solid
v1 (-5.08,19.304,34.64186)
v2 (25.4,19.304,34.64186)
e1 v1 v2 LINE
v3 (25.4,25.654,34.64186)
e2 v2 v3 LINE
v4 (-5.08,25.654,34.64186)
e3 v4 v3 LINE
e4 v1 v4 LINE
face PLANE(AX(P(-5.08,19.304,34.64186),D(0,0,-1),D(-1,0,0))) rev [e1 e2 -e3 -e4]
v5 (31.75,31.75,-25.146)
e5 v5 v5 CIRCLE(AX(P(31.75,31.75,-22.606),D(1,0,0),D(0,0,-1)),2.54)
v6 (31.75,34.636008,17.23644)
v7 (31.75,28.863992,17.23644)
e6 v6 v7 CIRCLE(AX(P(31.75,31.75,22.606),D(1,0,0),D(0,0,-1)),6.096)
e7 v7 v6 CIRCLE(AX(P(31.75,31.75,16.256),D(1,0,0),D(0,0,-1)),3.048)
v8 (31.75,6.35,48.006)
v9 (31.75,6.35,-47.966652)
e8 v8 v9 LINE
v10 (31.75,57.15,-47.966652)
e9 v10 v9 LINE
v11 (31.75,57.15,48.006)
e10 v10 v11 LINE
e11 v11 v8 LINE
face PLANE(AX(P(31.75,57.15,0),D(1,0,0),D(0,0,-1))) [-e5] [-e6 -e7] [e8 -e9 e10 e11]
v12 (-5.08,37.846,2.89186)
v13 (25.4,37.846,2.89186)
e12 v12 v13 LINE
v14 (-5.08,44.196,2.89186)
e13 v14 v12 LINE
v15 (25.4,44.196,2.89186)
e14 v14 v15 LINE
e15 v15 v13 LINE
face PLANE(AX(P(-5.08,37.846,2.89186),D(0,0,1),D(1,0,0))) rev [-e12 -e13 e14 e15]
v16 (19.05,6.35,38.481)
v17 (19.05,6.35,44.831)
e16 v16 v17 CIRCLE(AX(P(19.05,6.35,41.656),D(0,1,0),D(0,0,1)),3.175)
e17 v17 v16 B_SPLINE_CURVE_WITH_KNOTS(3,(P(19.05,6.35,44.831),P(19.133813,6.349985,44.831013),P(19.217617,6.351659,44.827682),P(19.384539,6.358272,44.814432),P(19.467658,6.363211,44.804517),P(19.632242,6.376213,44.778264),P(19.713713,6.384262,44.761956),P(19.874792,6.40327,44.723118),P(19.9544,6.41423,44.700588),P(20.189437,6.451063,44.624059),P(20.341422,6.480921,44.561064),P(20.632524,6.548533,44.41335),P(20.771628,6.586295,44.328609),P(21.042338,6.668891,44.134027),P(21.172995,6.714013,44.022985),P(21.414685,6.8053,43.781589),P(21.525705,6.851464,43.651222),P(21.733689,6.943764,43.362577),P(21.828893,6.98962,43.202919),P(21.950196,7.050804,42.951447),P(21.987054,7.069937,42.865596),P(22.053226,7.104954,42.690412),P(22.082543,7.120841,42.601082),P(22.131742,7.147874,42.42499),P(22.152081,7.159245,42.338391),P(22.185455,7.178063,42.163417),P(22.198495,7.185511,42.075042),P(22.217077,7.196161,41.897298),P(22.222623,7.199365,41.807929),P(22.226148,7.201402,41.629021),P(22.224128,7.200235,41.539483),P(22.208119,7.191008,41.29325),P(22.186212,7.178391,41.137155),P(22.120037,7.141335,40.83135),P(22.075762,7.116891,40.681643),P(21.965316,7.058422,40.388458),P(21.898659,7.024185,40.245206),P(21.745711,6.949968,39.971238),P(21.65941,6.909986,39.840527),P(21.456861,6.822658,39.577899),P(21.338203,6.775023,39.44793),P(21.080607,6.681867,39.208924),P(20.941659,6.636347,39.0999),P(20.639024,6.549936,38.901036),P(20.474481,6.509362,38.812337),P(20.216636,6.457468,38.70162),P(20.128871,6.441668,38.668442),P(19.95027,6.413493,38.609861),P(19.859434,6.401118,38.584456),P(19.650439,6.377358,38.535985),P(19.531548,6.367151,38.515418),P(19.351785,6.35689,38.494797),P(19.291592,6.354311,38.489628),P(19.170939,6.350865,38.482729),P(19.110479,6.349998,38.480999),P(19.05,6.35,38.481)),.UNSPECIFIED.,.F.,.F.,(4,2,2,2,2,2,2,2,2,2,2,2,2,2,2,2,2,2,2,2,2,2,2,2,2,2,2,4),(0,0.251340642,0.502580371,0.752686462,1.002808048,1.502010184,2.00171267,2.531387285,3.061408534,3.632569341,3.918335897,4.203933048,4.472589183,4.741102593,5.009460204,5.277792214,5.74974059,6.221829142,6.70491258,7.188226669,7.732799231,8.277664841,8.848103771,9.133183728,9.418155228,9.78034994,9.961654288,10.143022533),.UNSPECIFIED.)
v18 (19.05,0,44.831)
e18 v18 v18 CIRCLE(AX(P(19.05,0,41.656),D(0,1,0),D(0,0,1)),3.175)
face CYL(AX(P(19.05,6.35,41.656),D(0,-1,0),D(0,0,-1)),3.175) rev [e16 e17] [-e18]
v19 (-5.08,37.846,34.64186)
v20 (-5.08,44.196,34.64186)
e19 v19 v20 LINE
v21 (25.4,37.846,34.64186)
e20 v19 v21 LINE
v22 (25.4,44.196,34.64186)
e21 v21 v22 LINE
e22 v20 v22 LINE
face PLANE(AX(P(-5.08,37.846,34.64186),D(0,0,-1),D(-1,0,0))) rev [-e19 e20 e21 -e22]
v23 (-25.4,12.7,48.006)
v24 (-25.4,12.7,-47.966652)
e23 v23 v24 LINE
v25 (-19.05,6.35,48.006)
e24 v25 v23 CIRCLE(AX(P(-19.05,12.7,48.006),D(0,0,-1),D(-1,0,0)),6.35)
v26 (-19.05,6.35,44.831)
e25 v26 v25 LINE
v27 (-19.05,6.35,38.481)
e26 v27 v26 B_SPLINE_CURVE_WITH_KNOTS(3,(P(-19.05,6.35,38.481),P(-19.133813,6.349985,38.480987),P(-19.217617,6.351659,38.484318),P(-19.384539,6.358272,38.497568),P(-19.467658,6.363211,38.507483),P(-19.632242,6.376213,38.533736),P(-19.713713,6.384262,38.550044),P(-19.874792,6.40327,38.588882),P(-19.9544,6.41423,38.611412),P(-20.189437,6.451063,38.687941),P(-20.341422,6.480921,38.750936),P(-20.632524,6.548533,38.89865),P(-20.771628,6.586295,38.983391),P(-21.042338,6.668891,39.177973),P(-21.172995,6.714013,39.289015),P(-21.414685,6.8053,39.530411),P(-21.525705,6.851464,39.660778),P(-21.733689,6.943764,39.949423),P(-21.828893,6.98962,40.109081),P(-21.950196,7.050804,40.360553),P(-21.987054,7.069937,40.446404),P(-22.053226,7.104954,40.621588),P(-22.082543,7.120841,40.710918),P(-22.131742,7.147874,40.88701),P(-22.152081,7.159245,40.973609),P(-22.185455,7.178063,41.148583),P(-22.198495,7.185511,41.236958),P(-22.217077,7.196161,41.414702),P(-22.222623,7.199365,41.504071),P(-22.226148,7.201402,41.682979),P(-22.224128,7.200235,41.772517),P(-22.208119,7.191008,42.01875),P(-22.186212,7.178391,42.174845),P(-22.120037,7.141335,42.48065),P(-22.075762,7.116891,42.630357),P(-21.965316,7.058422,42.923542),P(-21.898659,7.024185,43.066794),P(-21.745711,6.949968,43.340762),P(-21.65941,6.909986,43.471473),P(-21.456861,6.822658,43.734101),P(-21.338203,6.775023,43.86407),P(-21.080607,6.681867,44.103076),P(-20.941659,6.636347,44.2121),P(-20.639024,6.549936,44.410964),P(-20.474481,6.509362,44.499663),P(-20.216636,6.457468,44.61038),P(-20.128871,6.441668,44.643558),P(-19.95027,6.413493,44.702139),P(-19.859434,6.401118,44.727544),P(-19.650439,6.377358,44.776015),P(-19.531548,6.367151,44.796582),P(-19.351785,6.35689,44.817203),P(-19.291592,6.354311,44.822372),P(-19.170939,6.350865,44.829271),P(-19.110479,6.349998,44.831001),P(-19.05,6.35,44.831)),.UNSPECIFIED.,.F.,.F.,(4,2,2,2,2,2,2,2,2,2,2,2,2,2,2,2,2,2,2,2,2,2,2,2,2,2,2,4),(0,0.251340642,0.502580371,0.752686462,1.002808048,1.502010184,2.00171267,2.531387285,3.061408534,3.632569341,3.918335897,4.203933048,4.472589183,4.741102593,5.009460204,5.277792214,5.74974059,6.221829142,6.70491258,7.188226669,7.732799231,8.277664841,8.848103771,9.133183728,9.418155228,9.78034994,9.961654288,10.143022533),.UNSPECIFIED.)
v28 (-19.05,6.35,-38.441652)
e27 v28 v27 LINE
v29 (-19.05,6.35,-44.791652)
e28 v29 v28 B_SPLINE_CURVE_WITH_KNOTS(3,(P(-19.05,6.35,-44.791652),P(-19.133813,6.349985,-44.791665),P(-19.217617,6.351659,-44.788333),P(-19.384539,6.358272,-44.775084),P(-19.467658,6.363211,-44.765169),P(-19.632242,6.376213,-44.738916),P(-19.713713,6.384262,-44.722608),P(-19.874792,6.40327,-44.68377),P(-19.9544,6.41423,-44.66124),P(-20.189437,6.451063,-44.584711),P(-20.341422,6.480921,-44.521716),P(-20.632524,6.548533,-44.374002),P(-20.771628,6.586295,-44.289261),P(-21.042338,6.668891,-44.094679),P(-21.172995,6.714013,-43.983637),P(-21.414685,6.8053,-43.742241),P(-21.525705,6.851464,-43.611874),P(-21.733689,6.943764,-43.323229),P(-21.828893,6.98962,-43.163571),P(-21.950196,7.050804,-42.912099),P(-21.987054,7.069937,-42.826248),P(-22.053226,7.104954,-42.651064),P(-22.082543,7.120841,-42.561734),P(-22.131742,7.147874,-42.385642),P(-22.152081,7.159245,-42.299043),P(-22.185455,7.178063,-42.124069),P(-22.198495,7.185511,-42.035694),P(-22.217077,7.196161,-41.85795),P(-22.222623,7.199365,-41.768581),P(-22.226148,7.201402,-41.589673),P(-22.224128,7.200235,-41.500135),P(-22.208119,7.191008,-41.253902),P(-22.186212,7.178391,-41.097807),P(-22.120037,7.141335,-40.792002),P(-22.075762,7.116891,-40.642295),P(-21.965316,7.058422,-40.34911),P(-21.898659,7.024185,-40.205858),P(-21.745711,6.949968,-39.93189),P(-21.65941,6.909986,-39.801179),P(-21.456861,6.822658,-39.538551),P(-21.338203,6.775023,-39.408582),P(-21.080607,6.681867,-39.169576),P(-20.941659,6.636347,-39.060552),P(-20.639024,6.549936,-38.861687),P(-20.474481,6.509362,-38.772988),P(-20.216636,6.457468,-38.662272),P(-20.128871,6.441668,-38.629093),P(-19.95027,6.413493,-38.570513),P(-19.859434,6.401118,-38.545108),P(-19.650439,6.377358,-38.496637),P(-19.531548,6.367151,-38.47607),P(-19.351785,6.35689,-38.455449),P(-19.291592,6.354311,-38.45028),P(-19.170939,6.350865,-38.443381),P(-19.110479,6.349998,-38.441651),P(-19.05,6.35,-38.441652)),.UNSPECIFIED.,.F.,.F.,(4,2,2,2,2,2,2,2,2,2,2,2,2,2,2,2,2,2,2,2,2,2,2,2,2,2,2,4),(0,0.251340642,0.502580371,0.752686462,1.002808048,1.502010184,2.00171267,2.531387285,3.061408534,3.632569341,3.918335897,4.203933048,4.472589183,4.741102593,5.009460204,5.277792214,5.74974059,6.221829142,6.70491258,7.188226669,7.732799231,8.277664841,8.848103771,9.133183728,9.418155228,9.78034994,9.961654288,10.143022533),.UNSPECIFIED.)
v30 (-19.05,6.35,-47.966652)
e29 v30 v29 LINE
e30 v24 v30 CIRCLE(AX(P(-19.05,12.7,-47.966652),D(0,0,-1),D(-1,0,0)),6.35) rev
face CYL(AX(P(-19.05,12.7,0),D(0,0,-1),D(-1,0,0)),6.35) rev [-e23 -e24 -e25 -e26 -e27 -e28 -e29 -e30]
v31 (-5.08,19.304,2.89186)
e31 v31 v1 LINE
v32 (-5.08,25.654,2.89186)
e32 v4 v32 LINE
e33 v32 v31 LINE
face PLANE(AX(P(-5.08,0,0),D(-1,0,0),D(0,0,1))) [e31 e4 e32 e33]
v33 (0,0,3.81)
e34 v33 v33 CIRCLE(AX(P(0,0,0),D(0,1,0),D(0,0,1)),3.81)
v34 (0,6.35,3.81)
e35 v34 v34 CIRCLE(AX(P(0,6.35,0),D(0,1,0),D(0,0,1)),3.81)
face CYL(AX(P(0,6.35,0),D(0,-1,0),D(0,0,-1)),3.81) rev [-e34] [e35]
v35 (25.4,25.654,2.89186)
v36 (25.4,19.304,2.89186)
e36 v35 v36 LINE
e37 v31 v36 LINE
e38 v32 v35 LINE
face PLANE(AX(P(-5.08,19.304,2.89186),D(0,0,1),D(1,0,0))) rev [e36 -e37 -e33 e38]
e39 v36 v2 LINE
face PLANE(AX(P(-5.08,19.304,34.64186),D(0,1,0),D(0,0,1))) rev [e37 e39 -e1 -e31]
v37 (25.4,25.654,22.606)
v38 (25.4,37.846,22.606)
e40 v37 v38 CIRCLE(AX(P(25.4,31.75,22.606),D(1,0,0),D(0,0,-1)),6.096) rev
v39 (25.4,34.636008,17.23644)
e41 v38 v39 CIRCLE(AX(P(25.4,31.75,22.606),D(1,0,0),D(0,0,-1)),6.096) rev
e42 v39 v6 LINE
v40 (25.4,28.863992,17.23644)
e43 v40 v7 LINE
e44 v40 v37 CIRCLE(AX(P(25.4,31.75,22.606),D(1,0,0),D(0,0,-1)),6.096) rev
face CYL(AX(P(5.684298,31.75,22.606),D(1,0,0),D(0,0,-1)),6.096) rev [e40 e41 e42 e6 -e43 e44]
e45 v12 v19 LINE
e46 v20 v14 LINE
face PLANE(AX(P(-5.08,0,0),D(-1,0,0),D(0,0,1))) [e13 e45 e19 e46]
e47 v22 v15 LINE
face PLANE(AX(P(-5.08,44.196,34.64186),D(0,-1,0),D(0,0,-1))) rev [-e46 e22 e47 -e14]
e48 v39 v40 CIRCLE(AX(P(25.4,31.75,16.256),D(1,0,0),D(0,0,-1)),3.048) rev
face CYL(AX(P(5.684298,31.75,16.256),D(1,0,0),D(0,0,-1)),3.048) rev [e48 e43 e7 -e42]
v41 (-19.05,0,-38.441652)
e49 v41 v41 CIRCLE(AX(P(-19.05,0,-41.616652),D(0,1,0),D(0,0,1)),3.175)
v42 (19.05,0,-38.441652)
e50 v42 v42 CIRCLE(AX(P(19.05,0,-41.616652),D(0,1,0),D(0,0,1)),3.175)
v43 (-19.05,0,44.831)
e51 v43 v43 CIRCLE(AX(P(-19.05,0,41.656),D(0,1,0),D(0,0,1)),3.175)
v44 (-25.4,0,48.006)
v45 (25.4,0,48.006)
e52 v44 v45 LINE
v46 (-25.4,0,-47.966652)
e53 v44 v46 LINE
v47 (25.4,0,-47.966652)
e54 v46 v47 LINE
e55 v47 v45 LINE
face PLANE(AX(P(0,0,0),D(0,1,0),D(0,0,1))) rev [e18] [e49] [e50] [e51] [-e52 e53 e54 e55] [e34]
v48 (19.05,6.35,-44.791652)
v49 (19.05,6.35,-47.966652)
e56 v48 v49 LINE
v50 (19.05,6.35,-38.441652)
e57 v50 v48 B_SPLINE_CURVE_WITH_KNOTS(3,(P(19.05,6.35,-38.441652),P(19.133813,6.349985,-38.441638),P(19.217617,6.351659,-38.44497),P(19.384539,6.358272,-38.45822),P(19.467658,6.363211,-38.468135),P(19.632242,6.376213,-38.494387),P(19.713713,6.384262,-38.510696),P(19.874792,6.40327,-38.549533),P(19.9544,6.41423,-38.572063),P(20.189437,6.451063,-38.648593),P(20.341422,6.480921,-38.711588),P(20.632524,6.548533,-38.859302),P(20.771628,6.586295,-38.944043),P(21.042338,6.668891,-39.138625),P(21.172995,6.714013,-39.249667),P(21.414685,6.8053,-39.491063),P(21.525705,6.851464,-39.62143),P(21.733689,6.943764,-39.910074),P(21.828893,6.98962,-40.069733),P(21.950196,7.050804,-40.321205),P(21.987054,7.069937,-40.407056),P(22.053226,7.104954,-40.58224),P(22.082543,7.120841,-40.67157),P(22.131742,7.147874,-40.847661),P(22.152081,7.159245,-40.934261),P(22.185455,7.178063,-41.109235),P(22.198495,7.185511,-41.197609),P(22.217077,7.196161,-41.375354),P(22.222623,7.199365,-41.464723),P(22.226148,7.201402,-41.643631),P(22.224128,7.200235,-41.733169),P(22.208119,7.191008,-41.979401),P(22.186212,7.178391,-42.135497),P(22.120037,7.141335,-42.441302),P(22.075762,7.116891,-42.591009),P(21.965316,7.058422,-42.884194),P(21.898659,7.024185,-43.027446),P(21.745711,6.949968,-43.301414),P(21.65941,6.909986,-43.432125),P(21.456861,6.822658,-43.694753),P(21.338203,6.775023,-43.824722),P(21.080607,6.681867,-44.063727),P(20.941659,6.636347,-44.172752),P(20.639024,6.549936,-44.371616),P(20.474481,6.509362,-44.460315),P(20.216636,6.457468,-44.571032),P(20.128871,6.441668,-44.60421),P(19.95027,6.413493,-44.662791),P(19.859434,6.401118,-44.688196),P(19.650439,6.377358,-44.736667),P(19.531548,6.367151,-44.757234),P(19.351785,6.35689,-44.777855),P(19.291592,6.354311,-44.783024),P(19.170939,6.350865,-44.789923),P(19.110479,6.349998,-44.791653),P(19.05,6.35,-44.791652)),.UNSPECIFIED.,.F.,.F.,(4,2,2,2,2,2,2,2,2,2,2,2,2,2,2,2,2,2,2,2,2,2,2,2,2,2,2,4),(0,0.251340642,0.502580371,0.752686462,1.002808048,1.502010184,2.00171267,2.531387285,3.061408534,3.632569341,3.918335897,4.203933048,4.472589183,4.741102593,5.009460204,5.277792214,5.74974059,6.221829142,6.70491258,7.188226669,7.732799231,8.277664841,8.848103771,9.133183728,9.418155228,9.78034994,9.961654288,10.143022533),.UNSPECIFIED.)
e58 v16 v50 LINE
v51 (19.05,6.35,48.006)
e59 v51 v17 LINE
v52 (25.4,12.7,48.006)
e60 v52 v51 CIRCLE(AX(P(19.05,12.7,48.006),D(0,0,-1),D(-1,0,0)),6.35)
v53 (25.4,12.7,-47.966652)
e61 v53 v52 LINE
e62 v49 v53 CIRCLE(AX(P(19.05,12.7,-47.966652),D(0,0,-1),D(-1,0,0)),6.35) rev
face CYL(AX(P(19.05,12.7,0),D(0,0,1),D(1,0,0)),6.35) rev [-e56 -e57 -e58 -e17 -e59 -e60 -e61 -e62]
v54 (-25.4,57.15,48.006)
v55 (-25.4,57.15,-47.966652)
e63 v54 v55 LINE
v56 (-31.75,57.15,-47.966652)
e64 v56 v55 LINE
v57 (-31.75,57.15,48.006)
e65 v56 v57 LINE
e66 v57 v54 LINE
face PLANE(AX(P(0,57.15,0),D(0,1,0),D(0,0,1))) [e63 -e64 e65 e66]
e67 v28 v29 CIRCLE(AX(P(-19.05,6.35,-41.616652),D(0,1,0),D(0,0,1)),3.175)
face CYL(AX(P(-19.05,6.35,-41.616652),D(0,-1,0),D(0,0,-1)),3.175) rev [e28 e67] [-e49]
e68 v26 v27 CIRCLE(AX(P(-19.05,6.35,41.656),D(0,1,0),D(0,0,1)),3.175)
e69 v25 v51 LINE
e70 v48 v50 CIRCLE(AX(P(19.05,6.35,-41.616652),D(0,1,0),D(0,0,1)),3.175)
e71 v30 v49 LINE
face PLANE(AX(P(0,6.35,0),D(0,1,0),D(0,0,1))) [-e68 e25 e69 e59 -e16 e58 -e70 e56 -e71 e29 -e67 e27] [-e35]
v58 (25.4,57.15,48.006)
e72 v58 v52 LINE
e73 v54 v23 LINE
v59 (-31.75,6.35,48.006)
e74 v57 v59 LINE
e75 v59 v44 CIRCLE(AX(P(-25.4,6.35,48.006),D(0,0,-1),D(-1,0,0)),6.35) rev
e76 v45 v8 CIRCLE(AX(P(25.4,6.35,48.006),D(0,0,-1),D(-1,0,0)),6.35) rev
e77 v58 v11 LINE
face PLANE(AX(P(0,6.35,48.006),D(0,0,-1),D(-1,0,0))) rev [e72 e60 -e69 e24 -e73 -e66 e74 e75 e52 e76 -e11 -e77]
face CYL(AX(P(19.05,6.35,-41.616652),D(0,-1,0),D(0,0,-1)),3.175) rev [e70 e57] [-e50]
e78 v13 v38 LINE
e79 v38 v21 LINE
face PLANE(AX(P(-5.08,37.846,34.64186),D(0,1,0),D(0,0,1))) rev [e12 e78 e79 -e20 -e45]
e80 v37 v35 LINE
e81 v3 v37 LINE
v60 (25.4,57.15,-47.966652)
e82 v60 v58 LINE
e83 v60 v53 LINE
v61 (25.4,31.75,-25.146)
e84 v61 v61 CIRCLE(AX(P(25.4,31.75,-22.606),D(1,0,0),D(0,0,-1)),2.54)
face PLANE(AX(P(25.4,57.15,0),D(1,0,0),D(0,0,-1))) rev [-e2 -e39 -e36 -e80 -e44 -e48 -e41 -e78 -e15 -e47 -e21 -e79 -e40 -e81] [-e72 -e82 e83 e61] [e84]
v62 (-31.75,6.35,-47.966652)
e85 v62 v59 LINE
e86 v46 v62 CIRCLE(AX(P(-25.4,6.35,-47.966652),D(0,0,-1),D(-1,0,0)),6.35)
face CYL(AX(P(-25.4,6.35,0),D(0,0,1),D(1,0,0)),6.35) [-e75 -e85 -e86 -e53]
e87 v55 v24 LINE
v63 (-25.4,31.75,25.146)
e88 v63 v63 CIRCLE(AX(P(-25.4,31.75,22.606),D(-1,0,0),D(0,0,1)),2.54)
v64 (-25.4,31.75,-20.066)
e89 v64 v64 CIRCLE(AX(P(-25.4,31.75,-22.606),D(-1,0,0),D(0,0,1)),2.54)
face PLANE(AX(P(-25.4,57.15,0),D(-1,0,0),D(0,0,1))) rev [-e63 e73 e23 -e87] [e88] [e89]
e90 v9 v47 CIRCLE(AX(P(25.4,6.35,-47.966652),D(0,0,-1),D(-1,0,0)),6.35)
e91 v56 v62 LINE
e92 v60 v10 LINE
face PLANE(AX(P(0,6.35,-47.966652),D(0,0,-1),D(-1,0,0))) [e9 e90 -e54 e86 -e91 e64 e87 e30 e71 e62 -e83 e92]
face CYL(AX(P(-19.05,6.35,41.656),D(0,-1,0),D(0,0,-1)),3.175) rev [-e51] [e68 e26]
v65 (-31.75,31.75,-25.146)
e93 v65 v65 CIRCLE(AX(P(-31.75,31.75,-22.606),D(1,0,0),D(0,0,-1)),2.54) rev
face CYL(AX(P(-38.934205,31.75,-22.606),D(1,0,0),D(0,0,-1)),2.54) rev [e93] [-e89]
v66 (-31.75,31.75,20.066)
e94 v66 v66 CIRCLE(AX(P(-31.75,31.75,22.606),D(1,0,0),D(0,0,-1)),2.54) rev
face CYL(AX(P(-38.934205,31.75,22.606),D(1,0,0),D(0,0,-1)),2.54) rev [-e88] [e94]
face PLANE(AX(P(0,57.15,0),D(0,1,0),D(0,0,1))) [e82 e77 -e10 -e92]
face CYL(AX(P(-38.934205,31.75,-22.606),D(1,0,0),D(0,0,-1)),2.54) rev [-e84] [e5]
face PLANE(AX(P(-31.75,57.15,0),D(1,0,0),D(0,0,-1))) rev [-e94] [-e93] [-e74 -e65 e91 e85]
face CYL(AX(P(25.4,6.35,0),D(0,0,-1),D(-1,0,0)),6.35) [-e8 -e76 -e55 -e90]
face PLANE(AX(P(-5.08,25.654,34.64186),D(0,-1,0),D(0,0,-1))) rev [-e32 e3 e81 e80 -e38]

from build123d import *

# Parameters (mm, degrees)
SKETCH1_W           = 50.8
SKETCH1_H           = 95.972651844
SKETCH1_R           = 3.175
SKETCH1_R_2         = 3.81
BOSS_EXTRUDE1_DEPTH = 6.35
SKETCH1_3_W         = 6.35
SKETCH1_3_H         = 95.972651844
BOSS_EXTRUDE2_DEPTH = 57.15
FILLET1_R           = 6.35
SKETCH2_R           = 6.096
SKETCH2_R_2         = 2.54
SKETCH2_R_3         = 3.048
CUT_EXTRUDE1_DEPTH  = 6.35
CUT_EXTRUDE2_REACH  = 99.995
SKETCH2_4_R         = 2.54
SKETCH3_W           = 31.75
SKETCH3_H           = 6.35
BOSS_EXTRUDE4_DEPTH = 30.48


with BuildPart() as part:
    # Sketch1 → Boss-Extrude1 (new body)
    with BuildSketch(Plane(origin=(0, 0, 0), x_dir=(1, 0, 0), z_dir=(0, 1, 0))):
        with Locations((0, -0.019674078)):
            Rectangle(SKETCH1_W, SKETCH1_H)
        with Locations(Location((-19.05, -41.656, 0), (0, 0, 270))):
            Circle(SKETCH1_R, mode=Mode.SUBTRACT)
        with Locations(Location((19.05, -41.656, 0), (0, 0, 270))):
            Circle(SKETCH1_R, mode=Mode.SUBTRACT)
        with Locations(Location((-19.05, 41.616651844, 0), (0, 0, 270))):
            Circle(SKETCH1_R, mode=Mode.SUBTRACT)
        with Locations(Location((0, 0, 0), (0, 0, 270))):
            Circle(SKETCH1_R_2, mode=Mode.SUBTRACT)
        with Locations(Location((19.05, 41.616651844, 0), (0, 0, 270))):
            Circle(SKETCH1_R, mode=Mode.SUBTRACT)
    extrude(amount=BOSS_EXTRUDE1_DEPTH)

    # Sketch1<3> → Boss-Extrude2 (add)
    with BuildSketch(Plane(origin=(0, 0, 0), x_dir=(1, 0, 0), z_dir=(0, 1, 0))):
        with Locations((-28.575, -0.019674078)):
            Rectangle(SKETCH1_3_W, SKETCH1_3_H)
        with Locations((28.575, -0.019674078)):
            Rectangle(SKETCH1_3_W, SKETCH1_3_H)
    extrude(amount=BOSS_EXTRUDE2_DEPTH)

    # Fillet1
    # the kernel refuses this fillet: 6.35 mm, written as the material it adds along each edge
    with BuildSketch(Plane(origin=(25.4, 6.35, 48.006), x_dir=(0, 1, 0), z_dir=(0, 0, -1))) as fillet1_piece_1_section:
        with BuildLine():
            CenterArc((FILLET1_R, -FILLET1_R), FILLET1_R, 90, 90)
            Line((0, -FILLET1_R), (0, 0))
            Line((0, 0), (FILLET1_R, 0))
        make_face()
    fillet1_piece_1 = extrude(amount=95.972651844, mode=Mode.PRIVATE)
    fillet1_piece_1 = fillet1_piece_1 - Plane(origin=(19.05, 7.801972373, 41.656), x_dir=(0, 0, 1), z_dir=(0, -1, 0)) * Cylinder(3.175, 218, mode=Mode.PRIVATE)
    fillet1_piece_1 = fillet1_piece_1 - Plane(origin=(19.05, 7.801972373, -41.616651844), x_dir=(0, 0, 1), z_dir=(0, -1, 0)) * Cylinder(3.175, 218, mode=Mode.PRIVATE)
    add(fillet1_piece_1)
    with BuildSketch(Plane(origin=(-25.4, 6.35, -47.966651844), x_dir=(1, 0, 0), z_dir=(0, 0, 1))) as fillet1_piece_2_section:
        with BuildLine():
            CenterArc((FILLET1_R, FILLET1_R), FILLET1_R, 180, 90)
            Line((0, FILLET1_R), (0, 0))
            Line((0, 0), (FILLET1_R, 0))
        make_face()
    fillet1_piece_2 = extrude(amount=95.972651844, mode=Mode.PRIVATE)
    fillet1_piece_2 = fillet1_piece_2 - Plane(origin=(-19.05, 7.801971704, 41.656), x_dir=(0, 0, 1), z_dir=(0, -1, 0)) * Cylinder(3.175, 218, mode=Mode.PRIVATE)
    fillet1_piece_2 = fillet1_piece_2 - Plane(origin=(-19.05, 7.801971704, -41.616651844), x_dir=(0, 0, 1), z_dir=(0, -1, 0)) * Cylinder(3.175, 218, mode=Mode.PRIVATE)
    add(fillet1_piece_2)
    # the kernel refuses this fillet: 6.35 mm, written as the material it takes off along each edge
    with BuildSketch(Plane(origin=(-31.75, 0, -63.841651844), x_dir=(1, 0, 0), z_dir=(0, 0, 1)), Plane(origin=(31.75, 0, 63.881), x_dir=(-1, 0, 0), z_dir=(0, 0, -1))) as fillet1_2_piece_1:
        with BuildLine():
            CenterArc((FILLET1_R, FILLET1_R), FILLET1_R, 180, 90)
            Line((0, FILLET1_R), (0, 0))
            Line((0, 0), (FILLET1_R, 0))
        make_face()
    extrude(amount=127.722651844, mode=Mode.SUBTRACT)

    # Sketch2 → Cut-Extrude1 (cut)
    # profile 1 of 6: a face of its own
    with BuildSketch(Plane(origin=(31.75, 0, 0), x_dir=(0, 0, -1), z_dir=(1, 0, 0))):
        with Locations((-22.606, 31.75)):
            Circle(SKETCH2_R)
        with Locations((-22.606, 31.75)):
            Circle(SKETCH2_R_2, mode=Mode.SUBTRACT)
    # profile 2 of 6: a face of its own
    with BuildSketch(Plane(origin=(31.75, 0, 0), x_dir=(0, 0, -1), z_dir=(1, 0, 0))):
        with Locations((-22.606, 31.75)):
            Circle(SKETCH2_R_2)
    # profile 3 of 6: a face of its own
    with BuildSketch(Plane(origin=(31.75, 0, 0), x_dir=(0, 0, -1), z_dir=(1, 0, 0))):
        with Locations((-22.606, 31.75)):
            Circle(SKETCH2_R)
    # profile 4 of 6: a face of its own
    with BuildSketch(Plane(origin=(31.75, 0, 0), x_dir=(0, 0, -1), z_dir=(1, 0, 0))):
        with Locations((-16.256, 31.75)):
            Circle(SKETCH2_R_3)
    # profile 5 of 6: a face of its own
    with BuildSketch(Plane(origin=(31.75, 0, 0), x_dir=(0, 0, -1), z_dir=(1, 0, 0))):
        with Locations((-22.606, 31.75)):
            Circle(SKETCH2_R)
    # profile 6 of 6: a face of its own
    with BuildSketch(Plane(origin=(31.75, 0, 0), x_dir=(0, 0, -1), z_dir=(1, 0, 0))):
        with Locations((-16.256, 31.75)):
            Circle(SKETCH2_R_3)
    extrude(amount=-CUT_EXTRUDE1_DEPTH, mode=Mode.SUBTRACT)

    # Cut-Extrude2: up to this face of the body (flat: up to its plane)
    cut_extrude2_end = Plane(part.part.faces().sort_by_distance((-31.75, 31.75, 0.019674078))[0])
    # Sketch2<4> → Cut-Extrude2 (cut, up to the picked face)
    with BuildSketch(Plane(origin=(31.75, 0, 0), x_dir=(0, 0, -1), z_dir=(1, 0, 0)), mode=Mode.PRIVATE) as cut_extrude2_sk1:
        with Locations((22.606, 31.75)):
            Circle(SKETCH2_4_R)
    cut_extrude2_tool1 = split(extrude(cut_extrude2_sk1.sketch, amount=-CUT_EXTRUDE2_REACH, mode=Mode.PRIVATE), bisect_by=cut_extrude2_end, keep=Keep.BOTH, mode=Mode.PRIVATE)
    # Sketch2<4> → Cut-Extrude2 (cut, up to the picked face)
    with BuildSketch(Plane(origin=(31.75, 0, 0), x_dir=(0, 0, -1), z_dir=(1, 0, 0)), mode=Mode.PRIVATE) as cut_extrude2_sk2:
        with Locations((-22.606, 31.75)):
            Circle(SKETCH2_4_R)
    cut_extrude2_tool2 = split(extrude(cut_extrude2_sk2.sketch, amount=-CUT_EXTRUDE2_REACH, mode=Mode.PRIVATE), bisect_by=cut_extrude2_end, keep=Keep.BOTH, mode=Mode.PRIVATE)
    add(cut_extrude2_tool1.solids().sort_by(Axis((31.75, 31.75, -22.606), (-1, 0, 0)))[0], mode=Mode.SUBTRACT)
    add(cut_extrude2_tool2.solids().sort_by(Axis((31.75, 31.75, 22.606), (-1, 0, 0)))[0], mode=Mode.SUBTRACT)

    # Sketch3 → Boss-Extrude4 (add)
    with BuildSketch(Plane.ZY.offset(-25.4)):
        with Locations((18.766859732, 22.479)):
            Rectangle(SKETCH3_W, SKETCH3_H)
        with Locations((18.766859732, 41.021)):
            Rectangle(SKETCH3_W, SKETCH3_H)
    extrude(amount=BOSS_EXTRUDE4_DEPTH)


solid = part.part
